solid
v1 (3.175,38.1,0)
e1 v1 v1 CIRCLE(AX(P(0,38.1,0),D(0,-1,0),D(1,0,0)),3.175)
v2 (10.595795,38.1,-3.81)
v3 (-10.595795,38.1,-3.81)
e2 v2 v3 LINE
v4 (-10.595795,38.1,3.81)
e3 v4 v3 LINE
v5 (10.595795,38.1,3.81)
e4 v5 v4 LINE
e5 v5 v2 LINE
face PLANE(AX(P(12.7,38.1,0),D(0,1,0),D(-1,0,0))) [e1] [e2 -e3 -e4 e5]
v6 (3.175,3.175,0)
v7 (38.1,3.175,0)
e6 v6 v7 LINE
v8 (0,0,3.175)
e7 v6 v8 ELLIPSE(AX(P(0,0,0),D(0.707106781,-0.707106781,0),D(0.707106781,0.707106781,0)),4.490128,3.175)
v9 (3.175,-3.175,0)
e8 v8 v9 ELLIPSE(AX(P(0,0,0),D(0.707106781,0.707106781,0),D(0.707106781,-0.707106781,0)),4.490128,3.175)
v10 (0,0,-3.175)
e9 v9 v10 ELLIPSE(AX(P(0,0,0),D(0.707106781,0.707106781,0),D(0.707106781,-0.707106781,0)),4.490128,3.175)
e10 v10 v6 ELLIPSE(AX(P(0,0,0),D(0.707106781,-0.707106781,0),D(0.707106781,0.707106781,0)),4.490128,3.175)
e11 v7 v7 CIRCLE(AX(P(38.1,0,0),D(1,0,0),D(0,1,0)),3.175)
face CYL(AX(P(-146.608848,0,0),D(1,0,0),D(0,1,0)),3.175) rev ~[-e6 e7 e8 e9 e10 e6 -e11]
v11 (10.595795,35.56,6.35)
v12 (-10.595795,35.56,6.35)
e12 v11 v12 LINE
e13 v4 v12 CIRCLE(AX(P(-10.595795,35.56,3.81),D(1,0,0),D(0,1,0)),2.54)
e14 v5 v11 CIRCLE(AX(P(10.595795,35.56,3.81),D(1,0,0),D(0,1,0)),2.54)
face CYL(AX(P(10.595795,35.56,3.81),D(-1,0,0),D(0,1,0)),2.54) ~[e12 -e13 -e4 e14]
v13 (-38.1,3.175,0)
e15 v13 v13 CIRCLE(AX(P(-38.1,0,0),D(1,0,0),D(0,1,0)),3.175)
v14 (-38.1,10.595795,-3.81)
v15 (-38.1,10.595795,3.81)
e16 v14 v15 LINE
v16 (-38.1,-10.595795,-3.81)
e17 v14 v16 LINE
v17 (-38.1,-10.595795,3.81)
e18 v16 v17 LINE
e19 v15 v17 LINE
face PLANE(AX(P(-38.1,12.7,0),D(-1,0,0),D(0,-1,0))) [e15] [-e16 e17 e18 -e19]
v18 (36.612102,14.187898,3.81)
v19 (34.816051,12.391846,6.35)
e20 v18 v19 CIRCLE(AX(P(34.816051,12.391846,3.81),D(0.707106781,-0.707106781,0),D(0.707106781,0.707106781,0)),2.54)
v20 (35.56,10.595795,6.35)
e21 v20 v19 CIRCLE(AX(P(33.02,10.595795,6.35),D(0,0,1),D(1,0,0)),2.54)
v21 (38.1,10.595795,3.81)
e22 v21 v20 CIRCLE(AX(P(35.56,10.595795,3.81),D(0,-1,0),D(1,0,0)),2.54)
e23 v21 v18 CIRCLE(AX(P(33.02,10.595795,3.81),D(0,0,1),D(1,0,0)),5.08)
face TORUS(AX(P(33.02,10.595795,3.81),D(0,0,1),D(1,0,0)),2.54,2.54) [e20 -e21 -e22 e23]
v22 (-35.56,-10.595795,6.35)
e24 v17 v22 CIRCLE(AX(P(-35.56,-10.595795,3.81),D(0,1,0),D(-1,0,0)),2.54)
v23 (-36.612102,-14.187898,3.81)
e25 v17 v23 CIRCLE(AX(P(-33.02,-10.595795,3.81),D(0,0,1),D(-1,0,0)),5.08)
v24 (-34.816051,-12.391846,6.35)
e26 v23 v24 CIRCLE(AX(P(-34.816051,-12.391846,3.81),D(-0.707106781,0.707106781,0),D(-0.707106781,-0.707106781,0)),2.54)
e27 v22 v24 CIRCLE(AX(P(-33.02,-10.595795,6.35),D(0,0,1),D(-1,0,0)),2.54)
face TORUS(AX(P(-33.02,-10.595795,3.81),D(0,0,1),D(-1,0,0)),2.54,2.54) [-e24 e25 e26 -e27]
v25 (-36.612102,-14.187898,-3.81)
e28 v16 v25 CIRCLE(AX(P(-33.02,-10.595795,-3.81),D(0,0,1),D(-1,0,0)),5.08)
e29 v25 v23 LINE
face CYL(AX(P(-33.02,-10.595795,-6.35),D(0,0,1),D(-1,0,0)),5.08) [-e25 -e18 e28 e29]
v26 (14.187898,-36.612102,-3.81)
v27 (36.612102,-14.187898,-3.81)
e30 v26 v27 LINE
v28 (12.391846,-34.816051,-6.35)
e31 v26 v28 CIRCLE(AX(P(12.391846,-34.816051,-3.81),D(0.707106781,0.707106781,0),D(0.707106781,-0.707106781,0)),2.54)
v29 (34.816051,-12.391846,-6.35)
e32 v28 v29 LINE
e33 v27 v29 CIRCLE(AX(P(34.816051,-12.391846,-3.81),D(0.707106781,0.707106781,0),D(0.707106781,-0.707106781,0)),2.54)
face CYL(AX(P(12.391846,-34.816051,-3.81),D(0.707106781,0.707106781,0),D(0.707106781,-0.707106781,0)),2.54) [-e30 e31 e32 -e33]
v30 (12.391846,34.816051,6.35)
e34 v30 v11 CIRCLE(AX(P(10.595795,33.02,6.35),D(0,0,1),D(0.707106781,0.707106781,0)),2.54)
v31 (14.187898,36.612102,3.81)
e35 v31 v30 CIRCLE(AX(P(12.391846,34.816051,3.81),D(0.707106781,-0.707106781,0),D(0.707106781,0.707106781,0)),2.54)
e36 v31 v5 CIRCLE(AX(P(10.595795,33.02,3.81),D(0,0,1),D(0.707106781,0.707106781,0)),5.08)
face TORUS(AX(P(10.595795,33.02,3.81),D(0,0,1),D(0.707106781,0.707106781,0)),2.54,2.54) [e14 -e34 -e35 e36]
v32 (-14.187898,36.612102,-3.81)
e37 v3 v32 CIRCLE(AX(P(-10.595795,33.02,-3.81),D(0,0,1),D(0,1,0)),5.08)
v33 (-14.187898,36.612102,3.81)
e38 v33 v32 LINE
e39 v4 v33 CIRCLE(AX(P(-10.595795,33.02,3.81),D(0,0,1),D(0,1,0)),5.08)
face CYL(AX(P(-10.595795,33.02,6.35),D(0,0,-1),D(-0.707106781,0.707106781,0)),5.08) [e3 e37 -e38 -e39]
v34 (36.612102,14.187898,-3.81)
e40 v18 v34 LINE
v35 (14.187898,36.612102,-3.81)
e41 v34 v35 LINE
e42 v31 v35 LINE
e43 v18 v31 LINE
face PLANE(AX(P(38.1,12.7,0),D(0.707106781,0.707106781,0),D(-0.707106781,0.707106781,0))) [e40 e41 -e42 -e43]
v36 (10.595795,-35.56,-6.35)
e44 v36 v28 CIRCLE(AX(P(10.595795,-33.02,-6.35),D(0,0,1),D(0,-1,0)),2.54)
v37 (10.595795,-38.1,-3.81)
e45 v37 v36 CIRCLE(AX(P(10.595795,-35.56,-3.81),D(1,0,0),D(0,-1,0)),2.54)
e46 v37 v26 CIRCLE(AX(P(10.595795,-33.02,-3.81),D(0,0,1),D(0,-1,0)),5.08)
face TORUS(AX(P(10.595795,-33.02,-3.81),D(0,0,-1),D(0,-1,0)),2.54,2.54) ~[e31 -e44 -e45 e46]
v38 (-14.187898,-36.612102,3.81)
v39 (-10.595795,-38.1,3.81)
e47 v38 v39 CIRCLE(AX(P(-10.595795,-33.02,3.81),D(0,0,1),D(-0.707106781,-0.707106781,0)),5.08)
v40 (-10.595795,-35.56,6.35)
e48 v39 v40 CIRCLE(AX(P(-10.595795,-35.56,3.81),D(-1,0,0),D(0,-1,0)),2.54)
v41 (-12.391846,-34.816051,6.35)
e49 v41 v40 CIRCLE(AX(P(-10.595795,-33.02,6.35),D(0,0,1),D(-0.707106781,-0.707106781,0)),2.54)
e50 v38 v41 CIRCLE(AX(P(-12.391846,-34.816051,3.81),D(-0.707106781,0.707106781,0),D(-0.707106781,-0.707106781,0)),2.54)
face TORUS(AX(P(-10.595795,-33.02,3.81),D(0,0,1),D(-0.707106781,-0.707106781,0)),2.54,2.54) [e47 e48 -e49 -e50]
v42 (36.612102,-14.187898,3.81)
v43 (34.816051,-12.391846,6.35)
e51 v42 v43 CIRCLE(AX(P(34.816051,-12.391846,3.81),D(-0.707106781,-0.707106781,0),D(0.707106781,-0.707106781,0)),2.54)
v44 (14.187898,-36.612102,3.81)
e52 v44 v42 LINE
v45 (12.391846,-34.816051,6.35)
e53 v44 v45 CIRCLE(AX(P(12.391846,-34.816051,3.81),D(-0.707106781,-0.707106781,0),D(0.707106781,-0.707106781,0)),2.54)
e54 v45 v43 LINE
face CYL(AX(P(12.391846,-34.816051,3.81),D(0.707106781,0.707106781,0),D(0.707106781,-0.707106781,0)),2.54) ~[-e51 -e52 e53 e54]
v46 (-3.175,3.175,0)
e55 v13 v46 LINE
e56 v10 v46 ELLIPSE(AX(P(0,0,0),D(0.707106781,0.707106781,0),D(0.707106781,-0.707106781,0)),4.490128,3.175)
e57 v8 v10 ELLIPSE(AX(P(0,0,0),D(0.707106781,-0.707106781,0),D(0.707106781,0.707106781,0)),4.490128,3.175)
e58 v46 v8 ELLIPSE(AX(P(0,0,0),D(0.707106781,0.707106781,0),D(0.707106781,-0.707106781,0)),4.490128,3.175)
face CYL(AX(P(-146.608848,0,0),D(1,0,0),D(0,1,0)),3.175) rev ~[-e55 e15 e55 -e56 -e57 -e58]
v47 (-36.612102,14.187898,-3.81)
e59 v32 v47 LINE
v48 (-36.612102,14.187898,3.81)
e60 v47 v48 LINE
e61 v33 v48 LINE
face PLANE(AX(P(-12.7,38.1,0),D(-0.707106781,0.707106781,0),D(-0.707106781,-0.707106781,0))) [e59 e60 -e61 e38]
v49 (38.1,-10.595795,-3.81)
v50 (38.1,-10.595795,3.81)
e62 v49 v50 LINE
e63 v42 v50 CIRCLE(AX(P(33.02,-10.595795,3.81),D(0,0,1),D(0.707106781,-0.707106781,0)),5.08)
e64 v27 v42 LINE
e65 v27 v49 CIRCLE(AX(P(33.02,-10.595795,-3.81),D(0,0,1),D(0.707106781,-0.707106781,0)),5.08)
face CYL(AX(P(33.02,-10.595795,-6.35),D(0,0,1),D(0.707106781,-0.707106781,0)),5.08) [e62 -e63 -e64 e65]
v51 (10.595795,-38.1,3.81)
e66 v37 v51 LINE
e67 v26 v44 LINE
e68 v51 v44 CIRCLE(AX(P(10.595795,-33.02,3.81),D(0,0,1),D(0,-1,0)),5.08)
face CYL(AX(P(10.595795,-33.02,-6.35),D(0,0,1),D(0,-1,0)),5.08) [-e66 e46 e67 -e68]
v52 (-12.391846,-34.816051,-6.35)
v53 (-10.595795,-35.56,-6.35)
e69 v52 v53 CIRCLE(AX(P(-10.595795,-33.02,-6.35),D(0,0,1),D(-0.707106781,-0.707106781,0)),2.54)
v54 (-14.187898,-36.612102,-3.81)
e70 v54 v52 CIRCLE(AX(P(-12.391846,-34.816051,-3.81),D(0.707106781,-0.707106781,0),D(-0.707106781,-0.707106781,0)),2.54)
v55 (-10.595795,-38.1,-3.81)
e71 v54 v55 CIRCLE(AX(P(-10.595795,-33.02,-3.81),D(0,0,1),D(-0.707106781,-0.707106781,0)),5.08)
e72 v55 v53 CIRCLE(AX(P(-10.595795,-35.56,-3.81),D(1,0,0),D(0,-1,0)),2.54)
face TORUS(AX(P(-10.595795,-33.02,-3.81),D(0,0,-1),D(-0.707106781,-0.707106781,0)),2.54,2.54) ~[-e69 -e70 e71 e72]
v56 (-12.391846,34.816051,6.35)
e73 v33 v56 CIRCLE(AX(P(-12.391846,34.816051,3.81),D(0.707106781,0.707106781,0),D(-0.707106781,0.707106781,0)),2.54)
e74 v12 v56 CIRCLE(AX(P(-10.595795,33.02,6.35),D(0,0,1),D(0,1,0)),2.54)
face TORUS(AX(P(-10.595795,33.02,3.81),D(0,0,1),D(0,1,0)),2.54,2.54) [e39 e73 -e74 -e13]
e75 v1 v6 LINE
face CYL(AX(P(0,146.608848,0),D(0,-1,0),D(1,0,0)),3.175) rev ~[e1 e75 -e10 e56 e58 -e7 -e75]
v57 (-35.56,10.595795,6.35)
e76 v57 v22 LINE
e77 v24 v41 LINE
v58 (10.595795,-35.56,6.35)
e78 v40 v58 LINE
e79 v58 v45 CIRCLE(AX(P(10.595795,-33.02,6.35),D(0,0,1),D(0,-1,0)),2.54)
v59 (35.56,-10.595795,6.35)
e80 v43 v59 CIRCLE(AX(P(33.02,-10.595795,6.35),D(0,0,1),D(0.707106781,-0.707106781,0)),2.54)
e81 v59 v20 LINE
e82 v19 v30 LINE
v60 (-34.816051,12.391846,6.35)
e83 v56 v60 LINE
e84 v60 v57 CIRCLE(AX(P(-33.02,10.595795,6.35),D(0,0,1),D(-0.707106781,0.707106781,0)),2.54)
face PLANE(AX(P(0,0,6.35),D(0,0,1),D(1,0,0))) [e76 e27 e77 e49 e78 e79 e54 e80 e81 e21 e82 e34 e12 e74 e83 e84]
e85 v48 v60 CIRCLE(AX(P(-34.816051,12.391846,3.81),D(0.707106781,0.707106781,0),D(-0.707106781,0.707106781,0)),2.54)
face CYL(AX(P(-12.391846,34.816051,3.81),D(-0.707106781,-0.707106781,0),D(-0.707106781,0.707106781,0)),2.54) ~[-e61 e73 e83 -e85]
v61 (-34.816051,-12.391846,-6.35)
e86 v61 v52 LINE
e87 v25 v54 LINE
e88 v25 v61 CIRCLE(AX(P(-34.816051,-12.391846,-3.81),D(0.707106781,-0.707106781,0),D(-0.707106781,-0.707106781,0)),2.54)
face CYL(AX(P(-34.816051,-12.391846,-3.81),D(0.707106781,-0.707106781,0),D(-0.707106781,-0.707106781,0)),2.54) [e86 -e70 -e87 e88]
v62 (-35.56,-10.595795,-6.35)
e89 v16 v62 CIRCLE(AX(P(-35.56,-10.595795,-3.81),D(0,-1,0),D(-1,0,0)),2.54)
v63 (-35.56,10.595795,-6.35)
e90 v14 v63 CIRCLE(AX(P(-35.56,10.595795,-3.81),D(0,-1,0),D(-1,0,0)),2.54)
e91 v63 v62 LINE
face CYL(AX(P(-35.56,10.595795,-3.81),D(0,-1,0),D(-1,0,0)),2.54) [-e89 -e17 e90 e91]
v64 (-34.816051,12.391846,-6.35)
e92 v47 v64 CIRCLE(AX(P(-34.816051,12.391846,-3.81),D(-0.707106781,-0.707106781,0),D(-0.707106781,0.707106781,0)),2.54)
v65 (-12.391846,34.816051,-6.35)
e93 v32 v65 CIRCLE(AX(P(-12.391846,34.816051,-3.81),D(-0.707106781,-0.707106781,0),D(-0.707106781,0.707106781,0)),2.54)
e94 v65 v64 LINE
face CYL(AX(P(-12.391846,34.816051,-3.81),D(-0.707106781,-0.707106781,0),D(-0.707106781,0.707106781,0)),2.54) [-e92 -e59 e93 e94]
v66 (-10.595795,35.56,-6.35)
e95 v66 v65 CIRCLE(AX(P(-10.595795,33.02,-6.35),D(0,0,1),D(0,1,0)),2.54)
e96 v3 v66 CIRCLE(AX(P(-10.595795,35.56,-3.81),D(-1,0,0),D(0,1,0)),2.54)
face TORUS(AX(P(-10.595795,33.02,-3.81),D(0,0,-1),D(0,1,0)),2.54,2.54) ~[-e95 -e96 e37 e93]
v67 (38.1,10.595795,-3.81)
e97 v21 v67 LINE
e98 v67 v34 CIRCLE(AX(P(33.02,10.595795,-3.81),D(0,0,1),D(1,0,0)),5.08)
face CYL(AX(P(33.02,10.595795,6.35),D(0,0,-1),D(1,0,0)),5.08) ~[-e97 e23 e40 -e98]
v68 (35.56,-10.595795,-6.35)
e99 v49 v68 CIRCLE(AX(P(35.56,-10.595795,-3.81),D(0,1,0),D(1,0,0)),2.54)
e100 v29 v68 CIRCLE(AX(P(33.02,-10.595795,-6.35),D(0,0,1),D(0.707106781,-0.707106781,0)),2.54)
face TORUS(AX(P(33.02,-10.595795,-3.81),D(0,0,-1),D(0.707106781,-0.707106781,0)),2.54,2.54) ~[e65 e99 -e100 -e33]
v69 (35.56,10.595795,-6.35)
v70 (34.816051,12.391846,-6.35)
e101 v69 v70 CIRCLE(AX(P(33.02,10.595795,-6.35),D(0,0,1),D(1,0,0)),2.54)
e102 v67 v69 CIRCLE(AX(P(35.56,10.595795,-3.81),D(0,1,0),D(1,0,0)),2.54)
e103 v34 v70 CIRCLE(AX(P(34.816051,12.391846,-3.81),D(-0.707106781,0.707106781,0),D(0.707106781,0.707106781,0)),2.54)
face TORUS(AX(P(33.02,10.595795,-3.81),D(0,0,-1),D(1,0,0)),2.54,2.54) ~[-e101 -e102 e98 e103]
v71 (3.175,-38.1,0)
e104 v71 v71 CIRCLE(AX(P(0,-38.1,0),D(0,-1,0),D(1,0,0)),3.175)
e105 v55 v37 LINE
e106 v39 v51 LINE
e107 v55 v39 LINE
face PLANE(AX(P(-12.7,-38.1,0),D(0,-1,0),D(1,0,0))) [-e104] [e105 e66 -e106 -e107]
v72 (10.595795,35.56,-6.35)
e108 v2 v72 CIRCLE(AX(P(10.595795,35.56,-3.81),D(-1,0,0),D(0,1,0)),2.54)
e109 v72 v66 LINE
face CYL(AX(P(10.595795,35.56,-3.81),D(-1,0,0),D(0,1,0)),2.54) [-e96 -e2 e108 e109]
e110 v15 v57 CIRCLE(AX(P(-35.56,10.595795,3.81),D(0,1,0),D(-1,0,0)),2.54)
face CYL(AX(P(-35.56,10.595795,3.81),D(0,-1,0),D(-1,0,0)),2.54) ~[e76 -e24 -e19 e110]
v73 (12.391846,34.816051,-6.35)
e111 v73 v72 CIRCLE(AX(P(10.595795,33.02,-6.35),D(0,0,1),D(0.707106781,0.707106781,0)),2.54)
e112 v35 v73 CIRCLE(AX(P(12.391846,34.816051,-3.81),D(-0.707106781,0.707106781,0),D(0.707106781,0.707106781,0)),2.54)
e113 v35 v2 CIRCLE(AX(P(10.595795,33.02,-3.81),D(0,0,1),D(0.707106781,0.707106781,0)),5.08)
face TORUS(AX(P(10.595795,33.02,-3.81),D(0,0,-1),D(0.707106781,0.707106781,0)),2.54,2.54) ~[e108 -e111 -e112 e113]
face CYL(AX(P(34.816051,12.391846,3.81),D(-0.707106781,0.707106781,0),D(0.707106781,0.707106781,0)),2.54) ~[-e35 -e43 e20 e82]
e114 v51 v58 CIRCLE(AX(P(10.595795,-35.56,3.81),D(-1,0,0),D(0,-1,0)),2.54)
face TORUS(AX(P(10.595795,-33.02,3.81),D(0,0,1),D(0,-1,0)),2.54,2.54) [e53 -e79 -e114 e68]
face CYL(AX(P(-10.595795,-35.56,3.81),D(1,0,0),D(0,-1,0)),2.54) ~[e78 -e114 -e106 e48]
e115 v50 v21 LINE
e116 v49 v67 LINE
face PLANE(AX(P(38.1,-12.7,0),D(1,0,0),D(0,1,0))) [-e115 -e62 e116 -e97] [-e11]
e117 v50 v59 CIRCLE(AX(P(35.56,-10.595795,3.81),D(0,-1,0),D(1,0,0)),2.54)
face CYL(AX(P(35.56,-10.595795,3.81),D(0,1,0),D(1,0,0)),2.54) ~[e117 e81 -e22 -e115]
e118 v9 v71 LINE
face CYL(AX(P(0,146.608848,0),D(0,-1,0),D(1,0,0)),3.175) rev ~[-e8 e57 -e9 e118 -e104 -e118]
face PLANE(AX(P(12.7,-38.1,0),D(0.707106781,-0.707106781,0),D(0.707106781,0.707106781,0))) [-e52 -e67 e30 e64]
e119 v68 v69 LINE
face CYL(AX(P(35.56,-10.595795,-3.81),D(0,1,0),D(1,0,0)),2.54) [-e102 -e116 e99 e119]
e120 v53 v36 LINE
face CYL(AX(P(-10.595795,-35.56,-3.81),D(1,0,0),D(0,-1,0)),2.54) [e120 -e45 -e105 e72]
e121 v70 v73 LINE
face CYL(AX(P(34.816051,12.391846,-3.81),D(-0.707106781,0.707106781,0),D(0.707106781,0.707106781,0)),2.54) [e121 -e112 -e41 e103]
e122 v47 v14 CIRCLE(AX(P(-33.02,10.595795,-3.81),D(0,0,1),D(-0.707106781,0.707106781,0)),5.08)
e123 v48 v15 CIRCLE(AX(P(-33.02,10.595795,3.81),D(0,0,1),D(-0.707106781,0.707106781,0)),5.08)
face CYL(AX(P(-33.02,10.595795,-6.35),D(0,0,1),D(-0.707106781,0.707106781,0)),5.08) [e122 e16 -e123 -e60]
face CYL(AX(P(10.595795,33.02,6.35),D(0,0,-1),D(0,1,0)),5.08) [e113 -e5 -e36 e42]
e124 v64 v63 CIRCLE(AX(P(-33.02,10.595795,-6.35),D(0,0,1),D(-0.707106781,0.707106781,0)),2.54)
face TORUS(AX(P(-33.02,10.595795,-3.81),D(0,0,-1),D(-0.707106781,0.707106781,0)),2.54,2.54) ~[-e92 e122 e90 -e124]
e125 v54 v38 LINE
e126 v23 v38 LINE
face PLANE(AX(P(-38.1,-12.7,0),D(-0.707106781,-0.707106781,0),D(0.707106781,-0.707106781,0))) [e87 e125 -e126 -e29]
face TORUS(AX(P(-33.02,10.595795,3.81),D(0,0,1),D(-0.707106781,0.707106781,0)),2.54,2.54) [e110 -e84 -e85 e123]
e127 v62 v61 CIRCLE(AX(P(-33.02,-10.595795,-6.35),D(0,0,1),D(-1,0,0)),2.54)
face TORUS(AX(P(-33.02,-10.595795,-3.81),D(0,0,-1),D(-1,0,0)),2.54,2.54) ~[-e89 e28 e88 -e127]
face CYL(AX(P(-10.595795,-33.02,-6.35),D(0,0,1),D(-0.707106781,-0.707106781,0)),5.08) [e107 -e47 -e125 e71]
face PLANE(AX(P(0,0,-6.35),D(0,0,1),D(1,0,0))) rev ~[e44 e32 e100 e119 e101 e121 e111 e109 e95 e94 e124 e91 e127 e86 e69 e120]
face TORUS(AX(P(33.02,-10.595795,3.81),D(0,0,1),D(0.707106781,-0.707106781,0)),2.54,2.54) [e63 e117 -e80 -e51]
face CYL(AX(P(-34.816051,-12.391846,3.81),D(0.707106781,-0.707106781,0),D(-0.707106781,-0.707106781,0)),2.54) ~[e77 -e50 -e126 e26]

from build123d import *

# Parameters (mm, degrees)
F1_DEPTH = 6.35
F3_D     = 6.35
F4_R     = 5.08
F5_R     = 2.54
F7_D     = 6.35


with BuildPart() as f1:
    # F0 (on Top) → F1 (new body, symmetric)
    with BuildSketch(Plane.XY):
        Polygon((-12.7, 38.1), (-38.1, 12.7), (-38.1, -12.7), (-12.7, -38.1), (12.7, -38.1), (38.1, -12.7), (38.1, 12.7), (12.7, 38.1), align=None)
    extrude(amount=F1_DEPTH, both=True)

    # F3 (through all)
    with Locations(Plane(origin=(-38.1, 0, 0), x_dir=(0, -1, 0), z_dir=(-1, 0, 0))):
        with Locations((0, 0)):
            Hole(F3_D / 2)

    # F4
    f4_edges = [f1.edges().sort_by_distance(p)[0] for p in [
        (-12.7, 38.1, 0),
        (-38.1, 12.7, 0),
        (12.7, 38.1, 0),
        (38.1, 12.7, 0),
        (-38.1, -12.7, 0),
        (-12.7, -38.1, 0),
        (12.7, -38.1, 0),
        (38.1, -12.7, 0),
    ]]
    fillet(f4_edges, radius=F4_R)

    # F5
    f5_edges = [f1.edges().sort_by_distance(p)[0] for p in [
        (-25.4, 25.4, 6.35),
        (-12.539827, 37.713308, 6.35),
        (-37.713308, 12.539827, 6.35),
        (0, 38.1, 6.35),
        (-38.1, 0, 6.35),
        (12.539827, 37.713308, 6.35),
        (-37.713308, -12.539827, 6.35),
        (25.4, 25.4, 6.35),
        (-25.4, -25.4, 6.35),
        (37.713308, 12.539827, 6.35),
        (-12.539827, -37.713308, 6.35),
        (38.1, 0, 6.35),
        (0, -38.1, 6.35),
        (37.713308, -12.539827, 6.35),
        (12.539827, -37.713308, 6.35),
        (25.4, -25.4, 6.35),
        (-25.4, 25.4, -6.35),
        (-12.539827, 37.713308, -6.35),
        (-37.713308, 12.539827, -6.35),
        (0, 38.1, -6.35),
        (-38.1, 0, -6.35),
        (12.539827, 37.713308, -6.35),
        (-37.713308, -12.539827, -6.35),
        (25.4, 25.4, -6.35),
        (-25.4, -25.4, -6.35),
        (37.713308, 12.539827, -6.35),
        (-12.539827, -37.713308, -6.35),
        (38.1, 0, -6.35),
        (0, -38.1, -6.35),
        (37.713308, -12.539827, -6.35),
        (12.539827, -37.713308, -6.35),
        (25.4, -25.4, -6.35),
    ]]
    fillet(f5_edges, radius=F5_R)

    # F7 (through all)
    with Locations(Plane(origin=(0, 38.1, 0), x_dir=(-1, 0, 0), z_dir=(0, 1, 0))):
        with Locations((0, 0)):
            Hole(F7_D / 2)


solid = f1.part
